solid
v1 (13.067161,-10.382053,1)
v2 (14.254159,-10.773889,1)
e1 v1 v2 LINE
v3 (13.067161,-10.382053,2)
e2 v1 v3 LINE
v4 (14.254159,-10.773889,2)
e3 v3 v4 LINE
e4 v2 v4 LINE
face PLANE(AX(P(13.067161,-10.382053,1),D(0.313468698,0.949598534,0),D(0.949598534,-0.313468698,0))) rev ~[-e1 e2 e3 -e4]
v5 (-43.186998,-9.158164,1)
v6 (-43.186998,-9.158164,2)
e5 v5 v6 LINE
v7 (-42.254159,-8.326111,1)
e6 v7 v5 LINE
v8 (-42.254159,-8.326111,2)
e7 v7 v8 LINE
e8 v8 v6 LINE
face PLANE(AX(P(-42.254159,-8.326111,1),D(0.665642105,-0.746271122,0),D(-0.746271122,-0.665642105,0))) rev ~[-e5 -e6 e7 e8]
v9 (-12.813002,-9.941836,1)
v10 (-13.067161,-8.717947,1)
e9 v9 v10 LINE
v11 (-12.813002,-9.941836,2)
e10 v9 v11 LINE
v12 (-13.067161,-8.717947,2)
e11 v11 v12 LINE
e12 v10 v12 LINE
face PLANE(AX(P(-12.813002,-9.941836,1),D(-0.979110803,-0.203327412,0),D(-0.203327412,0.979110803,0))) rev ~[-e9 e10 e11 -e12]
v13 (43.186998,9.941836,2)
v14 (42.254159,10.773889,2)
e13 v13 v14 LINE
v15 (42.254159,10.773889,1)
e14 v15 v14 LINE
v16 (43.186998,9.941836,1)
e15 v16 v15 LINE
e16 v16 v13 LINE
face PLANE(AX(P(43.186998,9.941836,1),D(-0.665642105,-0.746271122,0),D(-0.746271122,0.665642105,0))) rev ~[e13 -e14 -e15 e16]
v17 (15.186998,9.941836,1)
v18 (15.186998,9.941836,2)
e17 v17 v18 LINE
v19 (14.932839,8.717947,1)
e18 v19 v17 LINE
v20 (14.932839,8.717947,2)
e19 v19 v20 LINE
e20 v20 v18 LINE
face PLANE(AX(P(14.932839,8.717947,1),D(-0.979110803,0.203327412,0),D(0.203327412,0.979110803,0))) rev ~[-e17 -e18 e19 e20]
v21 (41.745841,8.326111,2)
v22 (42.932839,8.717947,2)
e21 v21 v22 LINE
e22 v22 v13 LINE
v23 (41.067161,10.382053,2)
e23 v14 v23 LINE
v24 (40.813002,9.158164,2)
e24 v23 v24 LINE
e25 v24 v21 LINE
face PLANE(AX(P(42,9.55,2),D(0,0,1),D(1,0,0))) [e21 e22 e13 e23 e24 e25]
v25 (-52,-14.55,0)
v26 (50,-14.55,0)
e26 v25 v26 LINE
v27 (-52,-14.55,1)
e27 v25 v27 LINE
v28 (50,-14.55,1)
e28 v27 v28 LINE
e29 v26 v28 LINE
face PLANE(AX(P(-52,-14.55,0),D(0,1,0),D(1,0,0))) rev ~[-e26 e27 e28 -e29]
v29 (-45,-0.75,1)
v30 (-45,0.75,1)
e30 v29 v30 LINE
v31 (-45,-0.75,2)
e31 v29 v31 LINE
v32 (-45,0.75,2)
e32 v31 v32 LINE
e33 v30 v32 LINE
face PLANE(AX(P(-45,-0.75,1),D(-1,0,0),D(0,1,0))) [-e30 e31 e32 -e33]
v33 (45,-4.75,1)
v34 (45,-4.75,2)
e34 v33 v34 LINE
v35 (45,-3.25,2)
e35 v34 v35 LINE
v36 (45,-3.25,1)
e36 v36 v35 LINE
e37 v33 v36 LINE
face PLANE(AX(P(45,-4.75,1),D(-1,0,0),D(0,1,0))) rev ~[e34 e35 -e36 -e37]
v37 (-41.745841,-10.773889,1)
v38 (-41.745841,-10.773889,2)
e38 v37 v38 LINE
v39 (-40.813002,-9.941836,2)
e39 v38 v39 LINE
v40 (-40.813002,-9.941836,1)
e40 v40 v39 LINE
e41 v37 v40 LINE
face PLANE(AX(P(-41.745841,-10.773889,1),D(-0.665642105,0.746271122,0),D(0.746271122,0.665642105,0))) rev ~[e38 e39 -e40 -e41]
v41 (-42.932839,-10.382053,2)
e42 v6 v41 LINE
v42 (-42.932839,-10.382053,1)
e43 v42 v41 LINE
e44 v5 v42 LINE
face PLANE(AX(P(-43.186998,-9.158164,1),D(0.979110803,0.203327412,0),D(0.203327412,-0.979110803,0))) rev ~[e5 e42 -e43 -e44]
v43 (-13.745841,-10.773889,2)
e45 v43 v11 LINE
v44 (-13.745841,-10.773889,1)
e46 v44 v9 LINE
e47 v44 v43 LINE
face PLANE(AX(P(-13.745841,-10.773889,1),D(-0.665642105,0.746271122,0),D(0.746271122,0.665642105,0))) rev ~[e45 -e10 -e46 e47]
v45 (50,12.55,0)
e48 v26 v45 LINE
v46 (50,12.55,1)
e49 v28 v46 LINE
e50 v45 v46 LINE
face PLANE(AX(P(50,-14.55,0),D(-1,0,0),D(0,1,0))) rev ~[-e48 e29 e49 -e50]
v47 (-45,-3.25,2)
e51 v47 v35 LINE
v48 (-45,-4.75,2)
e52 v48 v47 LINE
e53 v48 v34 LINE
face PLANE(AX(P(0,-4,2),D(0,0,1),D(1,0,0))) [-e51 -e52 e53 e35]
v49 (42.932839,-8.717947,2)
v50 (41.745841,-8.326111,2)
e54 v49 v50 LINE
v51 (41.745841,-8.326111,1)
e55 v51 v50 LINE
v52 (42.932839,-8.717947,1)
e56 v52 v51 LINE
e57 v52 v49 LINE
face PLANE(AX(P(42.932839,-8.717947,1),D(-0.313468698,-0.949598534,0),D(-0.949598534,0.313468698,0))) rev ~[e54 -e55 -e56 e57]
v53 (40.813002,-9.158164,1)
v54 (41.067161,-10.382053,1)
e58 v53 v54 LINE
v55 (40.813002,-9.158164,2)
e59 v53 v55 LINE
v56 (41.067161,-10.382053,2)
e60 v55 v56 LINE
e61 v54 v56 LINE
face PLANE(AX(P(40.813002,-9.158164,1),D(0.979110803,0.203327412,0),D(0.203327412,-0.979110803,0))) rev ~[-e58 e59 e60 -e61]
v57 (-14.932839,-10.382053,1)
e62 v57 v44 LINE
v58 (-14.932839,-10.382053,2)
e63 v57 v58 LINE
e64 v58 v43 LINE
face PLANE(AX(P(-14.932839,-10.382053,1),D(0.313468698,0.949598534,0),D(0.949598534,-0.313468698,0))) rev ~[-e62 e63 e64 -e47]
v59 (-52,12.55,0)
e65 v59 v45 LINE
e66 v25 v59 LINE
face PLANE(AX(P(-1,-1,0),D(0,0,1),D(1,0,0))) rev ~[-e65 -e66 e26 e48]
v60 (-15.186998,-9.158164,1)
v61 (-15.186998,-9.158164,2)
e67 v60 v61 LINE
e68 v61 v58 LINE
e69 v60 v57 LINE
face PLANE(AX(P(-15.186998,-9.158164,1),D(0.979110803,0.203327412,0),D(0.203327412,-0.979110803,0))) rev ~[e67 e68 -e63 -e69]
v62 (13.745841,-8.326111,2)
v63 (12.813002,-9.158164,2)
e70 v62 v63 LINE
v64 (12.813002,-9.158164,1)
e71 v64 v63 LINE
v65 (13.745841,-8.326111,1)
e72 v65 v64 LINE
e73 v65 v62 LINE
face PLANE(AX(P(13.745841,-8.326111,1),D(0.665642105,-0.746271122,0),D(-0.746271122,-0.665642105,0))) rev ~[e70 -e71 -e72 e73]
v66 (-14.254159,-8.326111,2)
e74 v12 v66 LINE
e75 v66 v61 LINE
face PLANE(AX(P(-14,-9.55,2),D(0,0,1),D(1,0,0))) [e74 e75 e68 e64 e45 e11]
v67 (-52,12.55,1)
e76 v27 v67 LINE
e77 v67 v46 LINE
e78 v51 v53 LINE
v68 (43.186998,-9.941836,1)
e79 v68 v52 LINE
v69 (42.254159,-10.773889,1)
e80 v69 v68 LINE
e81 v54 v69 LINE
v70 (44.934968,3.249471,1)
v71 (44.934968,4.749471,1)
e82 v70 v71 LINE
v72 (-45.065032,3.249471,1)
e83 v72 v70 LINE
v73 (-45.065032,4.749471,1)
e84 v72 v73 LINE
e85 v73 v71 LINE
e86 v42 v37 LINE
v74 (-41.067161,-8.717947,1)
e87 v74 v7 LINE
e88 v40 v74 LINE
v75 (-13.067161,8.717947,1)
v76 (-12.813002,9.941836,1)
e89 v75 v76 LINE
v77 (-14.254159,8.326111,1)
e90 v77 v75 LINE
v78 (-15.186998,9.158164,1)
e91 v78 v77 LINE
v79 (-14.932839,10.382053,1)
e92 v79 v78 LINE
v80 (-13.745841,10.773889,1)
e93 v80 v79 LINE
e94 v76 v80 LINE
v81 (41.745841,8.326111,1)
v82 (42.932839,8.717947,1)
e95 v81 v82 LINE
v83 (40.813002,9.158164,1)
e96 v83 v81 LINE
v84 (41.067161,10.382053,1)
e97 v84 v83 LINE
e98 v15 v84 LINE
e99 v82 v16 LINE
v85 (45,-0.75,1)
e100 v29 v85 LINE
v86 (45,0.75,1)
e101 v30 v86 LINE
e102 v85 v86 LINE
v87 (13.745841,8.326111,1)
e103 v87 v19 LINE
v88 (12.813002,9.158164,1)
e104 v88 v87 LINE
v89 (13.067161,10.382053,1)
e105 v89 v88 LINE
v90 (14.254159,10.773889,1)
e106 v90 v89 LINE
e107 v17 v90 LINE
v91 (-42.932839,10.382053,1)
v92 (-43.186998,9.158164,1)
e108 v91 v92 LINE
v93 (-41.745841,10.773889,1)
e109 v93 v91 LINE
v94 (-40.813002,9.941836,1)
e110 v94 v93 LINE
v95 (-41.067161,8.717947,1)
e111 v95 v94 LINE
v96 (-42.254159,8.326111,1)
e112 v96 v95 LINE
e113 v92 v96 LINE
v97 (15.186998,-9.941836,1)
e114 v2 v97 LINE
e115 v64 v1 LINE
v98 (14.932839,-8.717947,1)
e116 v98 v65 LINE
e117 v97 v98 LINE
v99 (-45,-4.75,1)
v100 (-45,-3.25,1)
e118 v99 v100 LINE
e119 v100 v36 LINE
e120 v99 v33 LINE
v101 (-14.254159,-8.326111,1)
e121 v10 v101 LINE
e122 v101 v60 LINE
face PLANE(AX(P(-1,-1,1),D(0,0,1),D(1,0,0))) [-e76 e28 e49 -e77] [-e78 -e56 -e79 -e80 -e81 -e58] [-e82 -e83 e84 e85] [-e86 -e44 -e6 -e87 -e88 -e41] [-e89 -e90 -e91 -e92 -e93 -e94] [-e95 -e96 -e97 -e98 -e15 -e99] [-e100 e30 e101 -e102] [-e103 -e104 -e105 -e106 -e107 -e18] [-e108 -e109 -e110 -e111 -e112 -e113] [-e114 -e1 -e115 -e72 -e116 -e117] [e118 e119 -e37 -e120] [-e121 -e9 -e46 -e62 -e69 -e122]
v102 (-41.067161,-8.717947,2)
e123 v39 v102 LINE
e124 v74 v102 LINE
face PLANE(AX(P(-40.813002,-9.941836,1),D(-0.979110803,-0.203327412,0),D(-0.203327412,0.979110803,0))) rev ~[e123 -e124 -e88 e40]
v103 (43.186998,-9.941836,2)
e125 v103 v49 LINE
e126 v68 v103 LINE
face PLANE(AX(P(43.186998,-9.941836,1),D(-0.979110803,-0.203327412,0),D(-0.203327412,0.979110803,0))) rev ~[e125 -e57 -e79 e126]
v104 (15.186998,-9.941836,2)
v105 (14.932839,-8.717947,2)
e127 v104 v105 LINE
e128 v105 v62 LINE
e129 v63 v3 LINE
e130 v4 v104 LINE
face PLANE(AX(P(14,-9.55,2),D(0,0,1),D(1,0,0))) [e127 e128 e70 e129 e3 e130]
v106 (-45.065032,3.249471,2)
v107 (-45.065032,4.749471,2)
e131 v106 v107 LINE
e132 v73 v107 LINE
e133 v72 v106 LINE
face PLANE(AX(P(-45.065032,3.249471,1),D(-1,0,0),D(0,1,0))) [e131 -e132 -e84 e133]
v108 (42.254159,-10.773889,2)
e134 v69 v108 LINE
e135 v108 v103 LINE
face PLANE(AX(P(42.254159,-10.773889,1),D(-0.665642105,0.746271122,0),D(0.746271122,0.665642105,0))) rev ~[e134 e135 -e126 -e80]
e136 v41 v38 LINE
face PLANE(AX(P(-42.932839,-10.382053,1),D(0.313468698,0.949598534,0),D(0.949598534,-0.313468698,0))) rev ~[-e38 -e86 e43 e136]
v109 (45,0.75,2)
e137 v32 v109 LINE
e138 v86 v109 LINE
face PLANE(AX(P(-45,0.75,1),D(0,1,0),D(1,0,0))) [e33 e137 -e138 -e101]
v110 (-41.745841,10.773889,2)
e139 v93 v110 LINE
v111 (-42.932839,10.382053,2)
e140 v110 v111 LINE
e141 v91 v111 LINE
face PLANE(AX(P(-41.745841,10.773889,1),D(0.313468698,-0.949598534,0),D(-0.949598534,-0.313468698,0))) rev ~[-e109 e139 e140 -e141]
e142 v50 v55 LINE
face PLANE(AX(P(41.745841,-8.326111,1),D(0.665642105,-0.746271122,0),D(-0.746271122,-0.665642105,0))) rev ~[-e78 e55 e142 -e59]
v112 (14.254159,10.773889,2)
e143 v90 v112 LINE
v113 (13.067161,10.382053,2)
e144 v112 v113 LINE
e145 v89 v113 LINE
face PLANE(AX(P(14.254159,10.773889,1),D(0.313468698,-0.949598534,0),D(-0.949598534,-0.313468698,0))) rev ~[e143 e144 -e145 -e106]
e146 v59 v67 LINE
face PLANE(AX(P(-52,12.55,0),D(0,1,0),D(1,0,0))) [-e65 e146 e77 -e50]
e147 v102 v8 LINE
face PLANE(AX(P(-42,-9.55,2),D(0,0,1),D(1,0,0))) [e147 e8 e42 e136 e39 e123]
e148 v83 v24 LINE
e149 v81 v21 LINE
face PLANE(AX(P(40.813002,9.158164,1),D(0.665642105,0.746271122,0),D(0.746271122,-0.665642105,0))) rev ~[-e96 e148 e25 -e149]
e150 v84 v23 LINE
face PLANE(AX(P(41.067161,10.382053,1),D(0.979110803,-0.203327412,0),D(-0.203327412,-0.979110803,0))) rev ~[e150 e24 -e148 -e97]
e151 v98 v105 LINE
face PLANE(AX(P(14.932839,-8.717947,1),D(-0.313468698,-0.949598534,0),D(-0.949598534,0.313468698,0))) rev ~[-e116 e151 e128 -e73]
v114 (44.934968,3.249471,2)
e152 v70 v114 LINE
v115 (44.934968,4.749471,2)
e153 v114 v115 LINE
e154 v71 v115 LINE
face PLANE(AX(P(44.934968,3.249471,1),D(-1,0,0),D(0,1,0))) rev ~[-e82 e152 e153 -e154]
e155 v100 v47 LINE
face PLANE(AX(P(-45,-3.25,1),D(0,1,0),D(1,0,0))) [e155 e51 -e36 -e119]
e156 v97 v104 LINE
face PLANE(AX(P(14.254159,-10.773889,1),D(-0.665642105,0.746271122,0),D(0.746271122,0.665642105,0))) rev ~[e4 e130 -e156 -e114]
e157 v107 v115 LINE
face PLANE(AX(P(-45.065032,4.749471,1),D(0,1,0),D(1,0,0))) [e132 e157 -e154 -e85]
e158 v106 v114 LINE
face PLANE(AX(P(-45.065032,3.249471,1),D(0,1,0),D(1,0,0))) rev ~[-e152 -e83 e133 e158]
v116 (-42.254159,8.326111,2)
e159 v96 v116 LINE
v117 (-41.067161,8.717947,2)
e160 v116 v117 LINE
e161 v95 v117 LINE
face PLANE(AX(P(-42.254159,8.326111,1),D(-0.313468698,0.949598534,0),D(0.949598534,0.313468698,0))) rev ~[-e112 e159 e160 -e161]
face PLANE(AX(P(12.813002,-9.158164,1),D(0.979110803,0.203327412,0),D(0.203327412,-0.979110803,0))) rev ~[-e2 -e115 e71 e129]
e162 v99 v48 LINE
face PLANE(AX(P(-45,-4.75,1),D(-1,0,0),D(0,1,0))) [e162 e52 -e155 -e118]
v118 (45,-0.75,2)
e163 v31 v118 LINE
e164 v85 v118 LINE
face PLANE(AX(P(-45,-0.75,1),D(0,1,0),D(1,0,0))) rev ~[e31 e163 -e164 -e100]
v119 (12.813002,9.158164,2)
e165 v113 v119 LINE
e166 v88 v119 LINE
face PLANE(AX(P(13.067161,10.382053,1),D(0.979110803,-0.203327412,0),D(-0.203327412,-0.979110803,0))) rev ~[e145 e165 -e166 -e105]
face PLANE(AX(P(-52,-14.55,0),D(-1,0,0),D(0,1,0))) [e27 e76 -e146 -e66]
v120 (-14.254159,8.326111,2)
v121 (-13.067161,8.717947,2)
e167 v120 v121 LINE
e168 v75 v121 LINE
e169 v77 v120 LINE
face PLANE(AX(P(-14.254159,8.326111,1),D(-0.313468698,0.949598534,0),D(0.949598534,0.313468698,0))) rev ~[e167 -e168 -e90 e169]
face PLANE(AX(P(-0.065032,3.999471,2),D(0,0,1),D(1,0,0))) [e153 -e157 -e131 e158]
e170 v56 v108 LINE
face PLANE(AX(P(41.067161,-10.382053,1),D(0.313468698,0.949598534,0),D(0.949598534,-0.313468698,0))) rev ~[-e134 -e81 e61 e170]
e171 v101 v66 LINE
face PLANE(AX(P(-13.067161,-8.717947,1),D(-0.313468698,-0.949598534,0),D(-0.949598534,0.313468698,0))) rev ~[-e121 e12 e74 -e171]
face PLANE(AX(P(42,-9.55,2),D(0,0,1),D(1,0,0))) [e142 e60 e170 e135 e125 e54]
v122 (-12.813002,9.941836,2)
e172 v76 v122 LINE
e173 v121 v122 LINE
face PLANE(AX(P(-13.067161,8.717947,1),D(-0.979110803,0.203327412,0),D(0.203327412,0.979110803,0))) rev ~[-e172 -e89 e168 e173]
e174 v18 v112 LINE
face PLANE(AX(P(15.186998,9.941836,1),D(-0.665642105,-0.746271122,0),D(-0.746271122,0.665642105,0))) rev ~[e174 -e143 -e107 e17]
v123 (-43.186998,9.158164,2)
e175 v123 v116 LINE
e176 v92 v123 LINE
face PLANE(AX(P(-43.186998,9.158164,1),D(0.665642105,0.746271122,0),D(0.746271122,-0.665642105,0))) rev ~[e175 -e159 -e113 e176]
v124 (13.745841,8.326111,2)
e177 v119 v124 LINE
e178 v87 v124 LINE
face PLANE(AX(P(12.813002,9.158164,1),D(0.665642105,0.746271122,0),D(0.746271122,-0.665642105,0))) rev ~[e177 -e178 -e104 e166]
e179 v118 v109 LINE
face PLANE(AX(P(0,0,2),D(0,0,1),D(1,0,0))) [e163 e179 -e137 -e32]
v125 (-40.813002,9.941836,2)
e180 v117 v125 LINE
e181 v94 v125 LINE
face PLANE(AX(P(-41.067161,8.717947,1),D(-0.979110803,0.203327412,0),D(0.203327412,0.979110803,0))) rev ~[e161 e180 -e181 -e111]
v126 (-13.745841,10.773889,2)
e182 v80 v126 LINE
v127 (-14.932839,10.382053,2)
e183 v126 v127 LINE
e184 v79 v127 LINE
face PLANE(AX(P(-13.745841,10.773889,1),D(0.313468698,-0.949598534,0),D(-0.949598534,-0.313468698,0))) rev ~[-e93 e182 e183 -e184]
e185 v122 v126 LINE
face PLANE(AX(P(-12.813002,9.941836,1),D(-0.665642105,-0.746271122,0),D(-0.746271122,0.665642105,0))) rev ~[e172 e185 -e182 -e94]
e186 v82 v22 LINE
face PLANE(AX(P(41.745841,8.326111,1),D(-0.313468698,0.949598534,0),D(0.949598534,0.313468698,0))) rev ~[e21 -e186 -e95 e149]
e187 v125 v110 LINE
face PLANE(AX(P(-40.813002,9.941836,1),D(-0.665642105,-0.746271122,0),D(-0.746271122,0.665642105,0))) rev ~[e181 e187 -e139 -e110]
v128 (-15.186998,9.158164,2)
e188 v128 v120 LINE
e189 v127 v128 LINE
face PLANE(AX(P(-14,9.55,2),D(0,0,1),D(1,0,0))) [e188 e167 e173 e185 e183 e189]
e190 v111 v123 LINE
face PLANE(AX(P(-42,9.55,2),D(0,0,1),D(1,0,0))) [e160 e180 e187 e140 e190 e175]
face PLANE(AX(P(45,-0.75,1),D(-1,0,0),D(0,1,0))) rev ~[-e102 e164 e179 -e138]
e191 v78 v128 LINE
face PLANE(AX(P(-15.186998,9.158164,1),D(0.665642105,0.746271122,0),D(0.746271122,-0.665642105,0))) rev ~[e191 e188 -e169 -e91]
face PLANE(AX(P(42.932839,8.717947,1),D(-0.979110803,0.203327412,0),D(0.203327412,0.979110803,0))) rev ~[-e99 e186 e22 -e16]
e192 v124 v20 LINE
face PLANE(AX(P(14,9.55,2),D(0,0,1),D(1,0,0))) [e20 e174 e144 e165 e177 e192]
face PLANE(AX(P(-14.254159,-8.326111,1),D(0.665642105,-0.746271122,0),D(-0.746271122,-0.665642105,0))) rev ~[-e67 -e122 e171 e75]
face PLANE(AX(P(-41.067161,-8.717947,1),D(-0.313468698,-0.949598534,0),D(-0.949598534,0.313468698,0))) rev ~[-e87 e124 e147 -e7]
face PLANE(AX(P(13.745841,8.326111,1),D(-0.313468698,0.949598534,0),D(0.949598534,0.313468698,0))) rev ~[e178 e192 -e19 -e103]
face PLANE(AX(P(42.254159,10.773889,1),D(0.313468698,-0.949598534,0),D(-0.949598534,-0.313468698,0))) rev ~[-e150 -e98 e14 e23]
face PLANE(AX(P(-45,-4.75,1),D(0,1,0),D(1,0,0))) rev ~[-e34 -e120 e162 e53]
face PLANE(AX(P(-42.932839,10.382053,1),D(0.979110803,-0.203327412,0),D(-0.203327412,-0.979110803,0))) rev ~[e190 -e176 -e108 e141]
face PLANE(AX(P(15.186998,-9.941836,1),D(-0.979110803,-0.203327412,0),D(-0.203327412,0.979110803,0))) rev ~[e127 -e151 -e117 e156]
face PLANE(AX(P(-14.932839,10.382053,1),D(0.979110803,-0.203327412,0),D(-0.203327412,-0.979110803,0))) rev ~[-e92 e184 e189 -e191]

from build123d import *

# Parameters (mm, degrees)
F0_W     = 102
F0_H     = 27.1
F1_DEPTH = 1
F2_W     = 90
F2_H     = 1.5
F3_DEPTH = 1


# Not quite as in the source:
# - a feature names something its author has since deleted; it is built from what else it names


with BuildPart() as f1:
    # F0 (on Top) → F1 (new body)
    with BuildSketch(Plane.XY):
        with Locations((-1, -1)):
            Rectangle(F0_W, F0_H)
    extrude(amount=F1_DEPTH)

    # F2 (on face) → F3 (join)
    with BuildSketch(Plane.XY.offset(1)):
        Polygon((-42.2541592645, 8.3261114968), (-41.0671610971, 8.7179473687), (-40.8130018326, 9.9418358719), (-41.7458407355, 10.7738885032), (-42.9328389029, 10.3820526313), (-43.1869981674, 9.1581641281), align=None)
        Polygon((-13.0671610971, 8.7179473687), (-12.8130018326, 9.9418358719), (-13.7458407355, 10.7738885032), (-14.9328389029, 10.3820526313), (-15.1869981674, 9.1581641281), (-14.2541592645, 8.3261114968), align=None)
        Polygon((14.9328389029, 8.7179473687), (15.1869981674, 9.9418358719), (14.2541592645, 10.7738885032), (13.0671610971, 10.3820526313), (12.8130018326, 9.1581641281), (13.7458407355, 8.3261114968), align=None)
        Polygon((42.9328389029, 8.7179473687), (43.1869981674, 9.9418358719), (42.2541592645, 10.7738885032), (41.0671610971, 10.3820526313), (40.8130018326, 9.1581641281), (41.7458407355, 8.3261114968), align=None)
        Polygon((-43.1869981674, -9.1581641281), (-42.9328389029, -10.3820526313), (-41.7458407355, -10.7738885032), (-40.8130018326, -9.9418358719), (-41.0671610971, -8.7179473687), (-42.2541592645, -8.3261114968), align=None)
        Polygon((-14.2541592645, -8.3261114968), (-15.1869981674, -9.1581641281), (-14.9328389029, -10.3820526313), (-13.7458407355, -10.7738885032), (-12.8130018326, -9.9418358719), (-13.0671610971, -8.7179473687), align=None)
        Polygon((13.7458407355, -8.3261114968), (12.8130018326, -9.1581641281), (13.0671610971, -10.3820526313), (14.2541592645, -10.7738885032), (15.1869981674, -9.9418358719), (14.9328389029, -8.7179473687), align=None)
        Polygon((42.9328389029, -8.7179473687), (41.7458407355, -8.3261114968), (40.8130018326, -9.1581641281), (41.0671610971, -10.3820526313), (42.2541592645, -10.7738885032), (43.1869981674, -9.9418358719), align=None)
        with Locations((-0.065032054, 3.9994713191)):
            Rectangle(F2_W, F2_H)
        Rectangle(F2_W, F2_H)
        with Locations((0, -4)):
            Rectangle(F2_W, F2_H)
    extrude(amount=F3_DEPTH)


solid = f1.part
